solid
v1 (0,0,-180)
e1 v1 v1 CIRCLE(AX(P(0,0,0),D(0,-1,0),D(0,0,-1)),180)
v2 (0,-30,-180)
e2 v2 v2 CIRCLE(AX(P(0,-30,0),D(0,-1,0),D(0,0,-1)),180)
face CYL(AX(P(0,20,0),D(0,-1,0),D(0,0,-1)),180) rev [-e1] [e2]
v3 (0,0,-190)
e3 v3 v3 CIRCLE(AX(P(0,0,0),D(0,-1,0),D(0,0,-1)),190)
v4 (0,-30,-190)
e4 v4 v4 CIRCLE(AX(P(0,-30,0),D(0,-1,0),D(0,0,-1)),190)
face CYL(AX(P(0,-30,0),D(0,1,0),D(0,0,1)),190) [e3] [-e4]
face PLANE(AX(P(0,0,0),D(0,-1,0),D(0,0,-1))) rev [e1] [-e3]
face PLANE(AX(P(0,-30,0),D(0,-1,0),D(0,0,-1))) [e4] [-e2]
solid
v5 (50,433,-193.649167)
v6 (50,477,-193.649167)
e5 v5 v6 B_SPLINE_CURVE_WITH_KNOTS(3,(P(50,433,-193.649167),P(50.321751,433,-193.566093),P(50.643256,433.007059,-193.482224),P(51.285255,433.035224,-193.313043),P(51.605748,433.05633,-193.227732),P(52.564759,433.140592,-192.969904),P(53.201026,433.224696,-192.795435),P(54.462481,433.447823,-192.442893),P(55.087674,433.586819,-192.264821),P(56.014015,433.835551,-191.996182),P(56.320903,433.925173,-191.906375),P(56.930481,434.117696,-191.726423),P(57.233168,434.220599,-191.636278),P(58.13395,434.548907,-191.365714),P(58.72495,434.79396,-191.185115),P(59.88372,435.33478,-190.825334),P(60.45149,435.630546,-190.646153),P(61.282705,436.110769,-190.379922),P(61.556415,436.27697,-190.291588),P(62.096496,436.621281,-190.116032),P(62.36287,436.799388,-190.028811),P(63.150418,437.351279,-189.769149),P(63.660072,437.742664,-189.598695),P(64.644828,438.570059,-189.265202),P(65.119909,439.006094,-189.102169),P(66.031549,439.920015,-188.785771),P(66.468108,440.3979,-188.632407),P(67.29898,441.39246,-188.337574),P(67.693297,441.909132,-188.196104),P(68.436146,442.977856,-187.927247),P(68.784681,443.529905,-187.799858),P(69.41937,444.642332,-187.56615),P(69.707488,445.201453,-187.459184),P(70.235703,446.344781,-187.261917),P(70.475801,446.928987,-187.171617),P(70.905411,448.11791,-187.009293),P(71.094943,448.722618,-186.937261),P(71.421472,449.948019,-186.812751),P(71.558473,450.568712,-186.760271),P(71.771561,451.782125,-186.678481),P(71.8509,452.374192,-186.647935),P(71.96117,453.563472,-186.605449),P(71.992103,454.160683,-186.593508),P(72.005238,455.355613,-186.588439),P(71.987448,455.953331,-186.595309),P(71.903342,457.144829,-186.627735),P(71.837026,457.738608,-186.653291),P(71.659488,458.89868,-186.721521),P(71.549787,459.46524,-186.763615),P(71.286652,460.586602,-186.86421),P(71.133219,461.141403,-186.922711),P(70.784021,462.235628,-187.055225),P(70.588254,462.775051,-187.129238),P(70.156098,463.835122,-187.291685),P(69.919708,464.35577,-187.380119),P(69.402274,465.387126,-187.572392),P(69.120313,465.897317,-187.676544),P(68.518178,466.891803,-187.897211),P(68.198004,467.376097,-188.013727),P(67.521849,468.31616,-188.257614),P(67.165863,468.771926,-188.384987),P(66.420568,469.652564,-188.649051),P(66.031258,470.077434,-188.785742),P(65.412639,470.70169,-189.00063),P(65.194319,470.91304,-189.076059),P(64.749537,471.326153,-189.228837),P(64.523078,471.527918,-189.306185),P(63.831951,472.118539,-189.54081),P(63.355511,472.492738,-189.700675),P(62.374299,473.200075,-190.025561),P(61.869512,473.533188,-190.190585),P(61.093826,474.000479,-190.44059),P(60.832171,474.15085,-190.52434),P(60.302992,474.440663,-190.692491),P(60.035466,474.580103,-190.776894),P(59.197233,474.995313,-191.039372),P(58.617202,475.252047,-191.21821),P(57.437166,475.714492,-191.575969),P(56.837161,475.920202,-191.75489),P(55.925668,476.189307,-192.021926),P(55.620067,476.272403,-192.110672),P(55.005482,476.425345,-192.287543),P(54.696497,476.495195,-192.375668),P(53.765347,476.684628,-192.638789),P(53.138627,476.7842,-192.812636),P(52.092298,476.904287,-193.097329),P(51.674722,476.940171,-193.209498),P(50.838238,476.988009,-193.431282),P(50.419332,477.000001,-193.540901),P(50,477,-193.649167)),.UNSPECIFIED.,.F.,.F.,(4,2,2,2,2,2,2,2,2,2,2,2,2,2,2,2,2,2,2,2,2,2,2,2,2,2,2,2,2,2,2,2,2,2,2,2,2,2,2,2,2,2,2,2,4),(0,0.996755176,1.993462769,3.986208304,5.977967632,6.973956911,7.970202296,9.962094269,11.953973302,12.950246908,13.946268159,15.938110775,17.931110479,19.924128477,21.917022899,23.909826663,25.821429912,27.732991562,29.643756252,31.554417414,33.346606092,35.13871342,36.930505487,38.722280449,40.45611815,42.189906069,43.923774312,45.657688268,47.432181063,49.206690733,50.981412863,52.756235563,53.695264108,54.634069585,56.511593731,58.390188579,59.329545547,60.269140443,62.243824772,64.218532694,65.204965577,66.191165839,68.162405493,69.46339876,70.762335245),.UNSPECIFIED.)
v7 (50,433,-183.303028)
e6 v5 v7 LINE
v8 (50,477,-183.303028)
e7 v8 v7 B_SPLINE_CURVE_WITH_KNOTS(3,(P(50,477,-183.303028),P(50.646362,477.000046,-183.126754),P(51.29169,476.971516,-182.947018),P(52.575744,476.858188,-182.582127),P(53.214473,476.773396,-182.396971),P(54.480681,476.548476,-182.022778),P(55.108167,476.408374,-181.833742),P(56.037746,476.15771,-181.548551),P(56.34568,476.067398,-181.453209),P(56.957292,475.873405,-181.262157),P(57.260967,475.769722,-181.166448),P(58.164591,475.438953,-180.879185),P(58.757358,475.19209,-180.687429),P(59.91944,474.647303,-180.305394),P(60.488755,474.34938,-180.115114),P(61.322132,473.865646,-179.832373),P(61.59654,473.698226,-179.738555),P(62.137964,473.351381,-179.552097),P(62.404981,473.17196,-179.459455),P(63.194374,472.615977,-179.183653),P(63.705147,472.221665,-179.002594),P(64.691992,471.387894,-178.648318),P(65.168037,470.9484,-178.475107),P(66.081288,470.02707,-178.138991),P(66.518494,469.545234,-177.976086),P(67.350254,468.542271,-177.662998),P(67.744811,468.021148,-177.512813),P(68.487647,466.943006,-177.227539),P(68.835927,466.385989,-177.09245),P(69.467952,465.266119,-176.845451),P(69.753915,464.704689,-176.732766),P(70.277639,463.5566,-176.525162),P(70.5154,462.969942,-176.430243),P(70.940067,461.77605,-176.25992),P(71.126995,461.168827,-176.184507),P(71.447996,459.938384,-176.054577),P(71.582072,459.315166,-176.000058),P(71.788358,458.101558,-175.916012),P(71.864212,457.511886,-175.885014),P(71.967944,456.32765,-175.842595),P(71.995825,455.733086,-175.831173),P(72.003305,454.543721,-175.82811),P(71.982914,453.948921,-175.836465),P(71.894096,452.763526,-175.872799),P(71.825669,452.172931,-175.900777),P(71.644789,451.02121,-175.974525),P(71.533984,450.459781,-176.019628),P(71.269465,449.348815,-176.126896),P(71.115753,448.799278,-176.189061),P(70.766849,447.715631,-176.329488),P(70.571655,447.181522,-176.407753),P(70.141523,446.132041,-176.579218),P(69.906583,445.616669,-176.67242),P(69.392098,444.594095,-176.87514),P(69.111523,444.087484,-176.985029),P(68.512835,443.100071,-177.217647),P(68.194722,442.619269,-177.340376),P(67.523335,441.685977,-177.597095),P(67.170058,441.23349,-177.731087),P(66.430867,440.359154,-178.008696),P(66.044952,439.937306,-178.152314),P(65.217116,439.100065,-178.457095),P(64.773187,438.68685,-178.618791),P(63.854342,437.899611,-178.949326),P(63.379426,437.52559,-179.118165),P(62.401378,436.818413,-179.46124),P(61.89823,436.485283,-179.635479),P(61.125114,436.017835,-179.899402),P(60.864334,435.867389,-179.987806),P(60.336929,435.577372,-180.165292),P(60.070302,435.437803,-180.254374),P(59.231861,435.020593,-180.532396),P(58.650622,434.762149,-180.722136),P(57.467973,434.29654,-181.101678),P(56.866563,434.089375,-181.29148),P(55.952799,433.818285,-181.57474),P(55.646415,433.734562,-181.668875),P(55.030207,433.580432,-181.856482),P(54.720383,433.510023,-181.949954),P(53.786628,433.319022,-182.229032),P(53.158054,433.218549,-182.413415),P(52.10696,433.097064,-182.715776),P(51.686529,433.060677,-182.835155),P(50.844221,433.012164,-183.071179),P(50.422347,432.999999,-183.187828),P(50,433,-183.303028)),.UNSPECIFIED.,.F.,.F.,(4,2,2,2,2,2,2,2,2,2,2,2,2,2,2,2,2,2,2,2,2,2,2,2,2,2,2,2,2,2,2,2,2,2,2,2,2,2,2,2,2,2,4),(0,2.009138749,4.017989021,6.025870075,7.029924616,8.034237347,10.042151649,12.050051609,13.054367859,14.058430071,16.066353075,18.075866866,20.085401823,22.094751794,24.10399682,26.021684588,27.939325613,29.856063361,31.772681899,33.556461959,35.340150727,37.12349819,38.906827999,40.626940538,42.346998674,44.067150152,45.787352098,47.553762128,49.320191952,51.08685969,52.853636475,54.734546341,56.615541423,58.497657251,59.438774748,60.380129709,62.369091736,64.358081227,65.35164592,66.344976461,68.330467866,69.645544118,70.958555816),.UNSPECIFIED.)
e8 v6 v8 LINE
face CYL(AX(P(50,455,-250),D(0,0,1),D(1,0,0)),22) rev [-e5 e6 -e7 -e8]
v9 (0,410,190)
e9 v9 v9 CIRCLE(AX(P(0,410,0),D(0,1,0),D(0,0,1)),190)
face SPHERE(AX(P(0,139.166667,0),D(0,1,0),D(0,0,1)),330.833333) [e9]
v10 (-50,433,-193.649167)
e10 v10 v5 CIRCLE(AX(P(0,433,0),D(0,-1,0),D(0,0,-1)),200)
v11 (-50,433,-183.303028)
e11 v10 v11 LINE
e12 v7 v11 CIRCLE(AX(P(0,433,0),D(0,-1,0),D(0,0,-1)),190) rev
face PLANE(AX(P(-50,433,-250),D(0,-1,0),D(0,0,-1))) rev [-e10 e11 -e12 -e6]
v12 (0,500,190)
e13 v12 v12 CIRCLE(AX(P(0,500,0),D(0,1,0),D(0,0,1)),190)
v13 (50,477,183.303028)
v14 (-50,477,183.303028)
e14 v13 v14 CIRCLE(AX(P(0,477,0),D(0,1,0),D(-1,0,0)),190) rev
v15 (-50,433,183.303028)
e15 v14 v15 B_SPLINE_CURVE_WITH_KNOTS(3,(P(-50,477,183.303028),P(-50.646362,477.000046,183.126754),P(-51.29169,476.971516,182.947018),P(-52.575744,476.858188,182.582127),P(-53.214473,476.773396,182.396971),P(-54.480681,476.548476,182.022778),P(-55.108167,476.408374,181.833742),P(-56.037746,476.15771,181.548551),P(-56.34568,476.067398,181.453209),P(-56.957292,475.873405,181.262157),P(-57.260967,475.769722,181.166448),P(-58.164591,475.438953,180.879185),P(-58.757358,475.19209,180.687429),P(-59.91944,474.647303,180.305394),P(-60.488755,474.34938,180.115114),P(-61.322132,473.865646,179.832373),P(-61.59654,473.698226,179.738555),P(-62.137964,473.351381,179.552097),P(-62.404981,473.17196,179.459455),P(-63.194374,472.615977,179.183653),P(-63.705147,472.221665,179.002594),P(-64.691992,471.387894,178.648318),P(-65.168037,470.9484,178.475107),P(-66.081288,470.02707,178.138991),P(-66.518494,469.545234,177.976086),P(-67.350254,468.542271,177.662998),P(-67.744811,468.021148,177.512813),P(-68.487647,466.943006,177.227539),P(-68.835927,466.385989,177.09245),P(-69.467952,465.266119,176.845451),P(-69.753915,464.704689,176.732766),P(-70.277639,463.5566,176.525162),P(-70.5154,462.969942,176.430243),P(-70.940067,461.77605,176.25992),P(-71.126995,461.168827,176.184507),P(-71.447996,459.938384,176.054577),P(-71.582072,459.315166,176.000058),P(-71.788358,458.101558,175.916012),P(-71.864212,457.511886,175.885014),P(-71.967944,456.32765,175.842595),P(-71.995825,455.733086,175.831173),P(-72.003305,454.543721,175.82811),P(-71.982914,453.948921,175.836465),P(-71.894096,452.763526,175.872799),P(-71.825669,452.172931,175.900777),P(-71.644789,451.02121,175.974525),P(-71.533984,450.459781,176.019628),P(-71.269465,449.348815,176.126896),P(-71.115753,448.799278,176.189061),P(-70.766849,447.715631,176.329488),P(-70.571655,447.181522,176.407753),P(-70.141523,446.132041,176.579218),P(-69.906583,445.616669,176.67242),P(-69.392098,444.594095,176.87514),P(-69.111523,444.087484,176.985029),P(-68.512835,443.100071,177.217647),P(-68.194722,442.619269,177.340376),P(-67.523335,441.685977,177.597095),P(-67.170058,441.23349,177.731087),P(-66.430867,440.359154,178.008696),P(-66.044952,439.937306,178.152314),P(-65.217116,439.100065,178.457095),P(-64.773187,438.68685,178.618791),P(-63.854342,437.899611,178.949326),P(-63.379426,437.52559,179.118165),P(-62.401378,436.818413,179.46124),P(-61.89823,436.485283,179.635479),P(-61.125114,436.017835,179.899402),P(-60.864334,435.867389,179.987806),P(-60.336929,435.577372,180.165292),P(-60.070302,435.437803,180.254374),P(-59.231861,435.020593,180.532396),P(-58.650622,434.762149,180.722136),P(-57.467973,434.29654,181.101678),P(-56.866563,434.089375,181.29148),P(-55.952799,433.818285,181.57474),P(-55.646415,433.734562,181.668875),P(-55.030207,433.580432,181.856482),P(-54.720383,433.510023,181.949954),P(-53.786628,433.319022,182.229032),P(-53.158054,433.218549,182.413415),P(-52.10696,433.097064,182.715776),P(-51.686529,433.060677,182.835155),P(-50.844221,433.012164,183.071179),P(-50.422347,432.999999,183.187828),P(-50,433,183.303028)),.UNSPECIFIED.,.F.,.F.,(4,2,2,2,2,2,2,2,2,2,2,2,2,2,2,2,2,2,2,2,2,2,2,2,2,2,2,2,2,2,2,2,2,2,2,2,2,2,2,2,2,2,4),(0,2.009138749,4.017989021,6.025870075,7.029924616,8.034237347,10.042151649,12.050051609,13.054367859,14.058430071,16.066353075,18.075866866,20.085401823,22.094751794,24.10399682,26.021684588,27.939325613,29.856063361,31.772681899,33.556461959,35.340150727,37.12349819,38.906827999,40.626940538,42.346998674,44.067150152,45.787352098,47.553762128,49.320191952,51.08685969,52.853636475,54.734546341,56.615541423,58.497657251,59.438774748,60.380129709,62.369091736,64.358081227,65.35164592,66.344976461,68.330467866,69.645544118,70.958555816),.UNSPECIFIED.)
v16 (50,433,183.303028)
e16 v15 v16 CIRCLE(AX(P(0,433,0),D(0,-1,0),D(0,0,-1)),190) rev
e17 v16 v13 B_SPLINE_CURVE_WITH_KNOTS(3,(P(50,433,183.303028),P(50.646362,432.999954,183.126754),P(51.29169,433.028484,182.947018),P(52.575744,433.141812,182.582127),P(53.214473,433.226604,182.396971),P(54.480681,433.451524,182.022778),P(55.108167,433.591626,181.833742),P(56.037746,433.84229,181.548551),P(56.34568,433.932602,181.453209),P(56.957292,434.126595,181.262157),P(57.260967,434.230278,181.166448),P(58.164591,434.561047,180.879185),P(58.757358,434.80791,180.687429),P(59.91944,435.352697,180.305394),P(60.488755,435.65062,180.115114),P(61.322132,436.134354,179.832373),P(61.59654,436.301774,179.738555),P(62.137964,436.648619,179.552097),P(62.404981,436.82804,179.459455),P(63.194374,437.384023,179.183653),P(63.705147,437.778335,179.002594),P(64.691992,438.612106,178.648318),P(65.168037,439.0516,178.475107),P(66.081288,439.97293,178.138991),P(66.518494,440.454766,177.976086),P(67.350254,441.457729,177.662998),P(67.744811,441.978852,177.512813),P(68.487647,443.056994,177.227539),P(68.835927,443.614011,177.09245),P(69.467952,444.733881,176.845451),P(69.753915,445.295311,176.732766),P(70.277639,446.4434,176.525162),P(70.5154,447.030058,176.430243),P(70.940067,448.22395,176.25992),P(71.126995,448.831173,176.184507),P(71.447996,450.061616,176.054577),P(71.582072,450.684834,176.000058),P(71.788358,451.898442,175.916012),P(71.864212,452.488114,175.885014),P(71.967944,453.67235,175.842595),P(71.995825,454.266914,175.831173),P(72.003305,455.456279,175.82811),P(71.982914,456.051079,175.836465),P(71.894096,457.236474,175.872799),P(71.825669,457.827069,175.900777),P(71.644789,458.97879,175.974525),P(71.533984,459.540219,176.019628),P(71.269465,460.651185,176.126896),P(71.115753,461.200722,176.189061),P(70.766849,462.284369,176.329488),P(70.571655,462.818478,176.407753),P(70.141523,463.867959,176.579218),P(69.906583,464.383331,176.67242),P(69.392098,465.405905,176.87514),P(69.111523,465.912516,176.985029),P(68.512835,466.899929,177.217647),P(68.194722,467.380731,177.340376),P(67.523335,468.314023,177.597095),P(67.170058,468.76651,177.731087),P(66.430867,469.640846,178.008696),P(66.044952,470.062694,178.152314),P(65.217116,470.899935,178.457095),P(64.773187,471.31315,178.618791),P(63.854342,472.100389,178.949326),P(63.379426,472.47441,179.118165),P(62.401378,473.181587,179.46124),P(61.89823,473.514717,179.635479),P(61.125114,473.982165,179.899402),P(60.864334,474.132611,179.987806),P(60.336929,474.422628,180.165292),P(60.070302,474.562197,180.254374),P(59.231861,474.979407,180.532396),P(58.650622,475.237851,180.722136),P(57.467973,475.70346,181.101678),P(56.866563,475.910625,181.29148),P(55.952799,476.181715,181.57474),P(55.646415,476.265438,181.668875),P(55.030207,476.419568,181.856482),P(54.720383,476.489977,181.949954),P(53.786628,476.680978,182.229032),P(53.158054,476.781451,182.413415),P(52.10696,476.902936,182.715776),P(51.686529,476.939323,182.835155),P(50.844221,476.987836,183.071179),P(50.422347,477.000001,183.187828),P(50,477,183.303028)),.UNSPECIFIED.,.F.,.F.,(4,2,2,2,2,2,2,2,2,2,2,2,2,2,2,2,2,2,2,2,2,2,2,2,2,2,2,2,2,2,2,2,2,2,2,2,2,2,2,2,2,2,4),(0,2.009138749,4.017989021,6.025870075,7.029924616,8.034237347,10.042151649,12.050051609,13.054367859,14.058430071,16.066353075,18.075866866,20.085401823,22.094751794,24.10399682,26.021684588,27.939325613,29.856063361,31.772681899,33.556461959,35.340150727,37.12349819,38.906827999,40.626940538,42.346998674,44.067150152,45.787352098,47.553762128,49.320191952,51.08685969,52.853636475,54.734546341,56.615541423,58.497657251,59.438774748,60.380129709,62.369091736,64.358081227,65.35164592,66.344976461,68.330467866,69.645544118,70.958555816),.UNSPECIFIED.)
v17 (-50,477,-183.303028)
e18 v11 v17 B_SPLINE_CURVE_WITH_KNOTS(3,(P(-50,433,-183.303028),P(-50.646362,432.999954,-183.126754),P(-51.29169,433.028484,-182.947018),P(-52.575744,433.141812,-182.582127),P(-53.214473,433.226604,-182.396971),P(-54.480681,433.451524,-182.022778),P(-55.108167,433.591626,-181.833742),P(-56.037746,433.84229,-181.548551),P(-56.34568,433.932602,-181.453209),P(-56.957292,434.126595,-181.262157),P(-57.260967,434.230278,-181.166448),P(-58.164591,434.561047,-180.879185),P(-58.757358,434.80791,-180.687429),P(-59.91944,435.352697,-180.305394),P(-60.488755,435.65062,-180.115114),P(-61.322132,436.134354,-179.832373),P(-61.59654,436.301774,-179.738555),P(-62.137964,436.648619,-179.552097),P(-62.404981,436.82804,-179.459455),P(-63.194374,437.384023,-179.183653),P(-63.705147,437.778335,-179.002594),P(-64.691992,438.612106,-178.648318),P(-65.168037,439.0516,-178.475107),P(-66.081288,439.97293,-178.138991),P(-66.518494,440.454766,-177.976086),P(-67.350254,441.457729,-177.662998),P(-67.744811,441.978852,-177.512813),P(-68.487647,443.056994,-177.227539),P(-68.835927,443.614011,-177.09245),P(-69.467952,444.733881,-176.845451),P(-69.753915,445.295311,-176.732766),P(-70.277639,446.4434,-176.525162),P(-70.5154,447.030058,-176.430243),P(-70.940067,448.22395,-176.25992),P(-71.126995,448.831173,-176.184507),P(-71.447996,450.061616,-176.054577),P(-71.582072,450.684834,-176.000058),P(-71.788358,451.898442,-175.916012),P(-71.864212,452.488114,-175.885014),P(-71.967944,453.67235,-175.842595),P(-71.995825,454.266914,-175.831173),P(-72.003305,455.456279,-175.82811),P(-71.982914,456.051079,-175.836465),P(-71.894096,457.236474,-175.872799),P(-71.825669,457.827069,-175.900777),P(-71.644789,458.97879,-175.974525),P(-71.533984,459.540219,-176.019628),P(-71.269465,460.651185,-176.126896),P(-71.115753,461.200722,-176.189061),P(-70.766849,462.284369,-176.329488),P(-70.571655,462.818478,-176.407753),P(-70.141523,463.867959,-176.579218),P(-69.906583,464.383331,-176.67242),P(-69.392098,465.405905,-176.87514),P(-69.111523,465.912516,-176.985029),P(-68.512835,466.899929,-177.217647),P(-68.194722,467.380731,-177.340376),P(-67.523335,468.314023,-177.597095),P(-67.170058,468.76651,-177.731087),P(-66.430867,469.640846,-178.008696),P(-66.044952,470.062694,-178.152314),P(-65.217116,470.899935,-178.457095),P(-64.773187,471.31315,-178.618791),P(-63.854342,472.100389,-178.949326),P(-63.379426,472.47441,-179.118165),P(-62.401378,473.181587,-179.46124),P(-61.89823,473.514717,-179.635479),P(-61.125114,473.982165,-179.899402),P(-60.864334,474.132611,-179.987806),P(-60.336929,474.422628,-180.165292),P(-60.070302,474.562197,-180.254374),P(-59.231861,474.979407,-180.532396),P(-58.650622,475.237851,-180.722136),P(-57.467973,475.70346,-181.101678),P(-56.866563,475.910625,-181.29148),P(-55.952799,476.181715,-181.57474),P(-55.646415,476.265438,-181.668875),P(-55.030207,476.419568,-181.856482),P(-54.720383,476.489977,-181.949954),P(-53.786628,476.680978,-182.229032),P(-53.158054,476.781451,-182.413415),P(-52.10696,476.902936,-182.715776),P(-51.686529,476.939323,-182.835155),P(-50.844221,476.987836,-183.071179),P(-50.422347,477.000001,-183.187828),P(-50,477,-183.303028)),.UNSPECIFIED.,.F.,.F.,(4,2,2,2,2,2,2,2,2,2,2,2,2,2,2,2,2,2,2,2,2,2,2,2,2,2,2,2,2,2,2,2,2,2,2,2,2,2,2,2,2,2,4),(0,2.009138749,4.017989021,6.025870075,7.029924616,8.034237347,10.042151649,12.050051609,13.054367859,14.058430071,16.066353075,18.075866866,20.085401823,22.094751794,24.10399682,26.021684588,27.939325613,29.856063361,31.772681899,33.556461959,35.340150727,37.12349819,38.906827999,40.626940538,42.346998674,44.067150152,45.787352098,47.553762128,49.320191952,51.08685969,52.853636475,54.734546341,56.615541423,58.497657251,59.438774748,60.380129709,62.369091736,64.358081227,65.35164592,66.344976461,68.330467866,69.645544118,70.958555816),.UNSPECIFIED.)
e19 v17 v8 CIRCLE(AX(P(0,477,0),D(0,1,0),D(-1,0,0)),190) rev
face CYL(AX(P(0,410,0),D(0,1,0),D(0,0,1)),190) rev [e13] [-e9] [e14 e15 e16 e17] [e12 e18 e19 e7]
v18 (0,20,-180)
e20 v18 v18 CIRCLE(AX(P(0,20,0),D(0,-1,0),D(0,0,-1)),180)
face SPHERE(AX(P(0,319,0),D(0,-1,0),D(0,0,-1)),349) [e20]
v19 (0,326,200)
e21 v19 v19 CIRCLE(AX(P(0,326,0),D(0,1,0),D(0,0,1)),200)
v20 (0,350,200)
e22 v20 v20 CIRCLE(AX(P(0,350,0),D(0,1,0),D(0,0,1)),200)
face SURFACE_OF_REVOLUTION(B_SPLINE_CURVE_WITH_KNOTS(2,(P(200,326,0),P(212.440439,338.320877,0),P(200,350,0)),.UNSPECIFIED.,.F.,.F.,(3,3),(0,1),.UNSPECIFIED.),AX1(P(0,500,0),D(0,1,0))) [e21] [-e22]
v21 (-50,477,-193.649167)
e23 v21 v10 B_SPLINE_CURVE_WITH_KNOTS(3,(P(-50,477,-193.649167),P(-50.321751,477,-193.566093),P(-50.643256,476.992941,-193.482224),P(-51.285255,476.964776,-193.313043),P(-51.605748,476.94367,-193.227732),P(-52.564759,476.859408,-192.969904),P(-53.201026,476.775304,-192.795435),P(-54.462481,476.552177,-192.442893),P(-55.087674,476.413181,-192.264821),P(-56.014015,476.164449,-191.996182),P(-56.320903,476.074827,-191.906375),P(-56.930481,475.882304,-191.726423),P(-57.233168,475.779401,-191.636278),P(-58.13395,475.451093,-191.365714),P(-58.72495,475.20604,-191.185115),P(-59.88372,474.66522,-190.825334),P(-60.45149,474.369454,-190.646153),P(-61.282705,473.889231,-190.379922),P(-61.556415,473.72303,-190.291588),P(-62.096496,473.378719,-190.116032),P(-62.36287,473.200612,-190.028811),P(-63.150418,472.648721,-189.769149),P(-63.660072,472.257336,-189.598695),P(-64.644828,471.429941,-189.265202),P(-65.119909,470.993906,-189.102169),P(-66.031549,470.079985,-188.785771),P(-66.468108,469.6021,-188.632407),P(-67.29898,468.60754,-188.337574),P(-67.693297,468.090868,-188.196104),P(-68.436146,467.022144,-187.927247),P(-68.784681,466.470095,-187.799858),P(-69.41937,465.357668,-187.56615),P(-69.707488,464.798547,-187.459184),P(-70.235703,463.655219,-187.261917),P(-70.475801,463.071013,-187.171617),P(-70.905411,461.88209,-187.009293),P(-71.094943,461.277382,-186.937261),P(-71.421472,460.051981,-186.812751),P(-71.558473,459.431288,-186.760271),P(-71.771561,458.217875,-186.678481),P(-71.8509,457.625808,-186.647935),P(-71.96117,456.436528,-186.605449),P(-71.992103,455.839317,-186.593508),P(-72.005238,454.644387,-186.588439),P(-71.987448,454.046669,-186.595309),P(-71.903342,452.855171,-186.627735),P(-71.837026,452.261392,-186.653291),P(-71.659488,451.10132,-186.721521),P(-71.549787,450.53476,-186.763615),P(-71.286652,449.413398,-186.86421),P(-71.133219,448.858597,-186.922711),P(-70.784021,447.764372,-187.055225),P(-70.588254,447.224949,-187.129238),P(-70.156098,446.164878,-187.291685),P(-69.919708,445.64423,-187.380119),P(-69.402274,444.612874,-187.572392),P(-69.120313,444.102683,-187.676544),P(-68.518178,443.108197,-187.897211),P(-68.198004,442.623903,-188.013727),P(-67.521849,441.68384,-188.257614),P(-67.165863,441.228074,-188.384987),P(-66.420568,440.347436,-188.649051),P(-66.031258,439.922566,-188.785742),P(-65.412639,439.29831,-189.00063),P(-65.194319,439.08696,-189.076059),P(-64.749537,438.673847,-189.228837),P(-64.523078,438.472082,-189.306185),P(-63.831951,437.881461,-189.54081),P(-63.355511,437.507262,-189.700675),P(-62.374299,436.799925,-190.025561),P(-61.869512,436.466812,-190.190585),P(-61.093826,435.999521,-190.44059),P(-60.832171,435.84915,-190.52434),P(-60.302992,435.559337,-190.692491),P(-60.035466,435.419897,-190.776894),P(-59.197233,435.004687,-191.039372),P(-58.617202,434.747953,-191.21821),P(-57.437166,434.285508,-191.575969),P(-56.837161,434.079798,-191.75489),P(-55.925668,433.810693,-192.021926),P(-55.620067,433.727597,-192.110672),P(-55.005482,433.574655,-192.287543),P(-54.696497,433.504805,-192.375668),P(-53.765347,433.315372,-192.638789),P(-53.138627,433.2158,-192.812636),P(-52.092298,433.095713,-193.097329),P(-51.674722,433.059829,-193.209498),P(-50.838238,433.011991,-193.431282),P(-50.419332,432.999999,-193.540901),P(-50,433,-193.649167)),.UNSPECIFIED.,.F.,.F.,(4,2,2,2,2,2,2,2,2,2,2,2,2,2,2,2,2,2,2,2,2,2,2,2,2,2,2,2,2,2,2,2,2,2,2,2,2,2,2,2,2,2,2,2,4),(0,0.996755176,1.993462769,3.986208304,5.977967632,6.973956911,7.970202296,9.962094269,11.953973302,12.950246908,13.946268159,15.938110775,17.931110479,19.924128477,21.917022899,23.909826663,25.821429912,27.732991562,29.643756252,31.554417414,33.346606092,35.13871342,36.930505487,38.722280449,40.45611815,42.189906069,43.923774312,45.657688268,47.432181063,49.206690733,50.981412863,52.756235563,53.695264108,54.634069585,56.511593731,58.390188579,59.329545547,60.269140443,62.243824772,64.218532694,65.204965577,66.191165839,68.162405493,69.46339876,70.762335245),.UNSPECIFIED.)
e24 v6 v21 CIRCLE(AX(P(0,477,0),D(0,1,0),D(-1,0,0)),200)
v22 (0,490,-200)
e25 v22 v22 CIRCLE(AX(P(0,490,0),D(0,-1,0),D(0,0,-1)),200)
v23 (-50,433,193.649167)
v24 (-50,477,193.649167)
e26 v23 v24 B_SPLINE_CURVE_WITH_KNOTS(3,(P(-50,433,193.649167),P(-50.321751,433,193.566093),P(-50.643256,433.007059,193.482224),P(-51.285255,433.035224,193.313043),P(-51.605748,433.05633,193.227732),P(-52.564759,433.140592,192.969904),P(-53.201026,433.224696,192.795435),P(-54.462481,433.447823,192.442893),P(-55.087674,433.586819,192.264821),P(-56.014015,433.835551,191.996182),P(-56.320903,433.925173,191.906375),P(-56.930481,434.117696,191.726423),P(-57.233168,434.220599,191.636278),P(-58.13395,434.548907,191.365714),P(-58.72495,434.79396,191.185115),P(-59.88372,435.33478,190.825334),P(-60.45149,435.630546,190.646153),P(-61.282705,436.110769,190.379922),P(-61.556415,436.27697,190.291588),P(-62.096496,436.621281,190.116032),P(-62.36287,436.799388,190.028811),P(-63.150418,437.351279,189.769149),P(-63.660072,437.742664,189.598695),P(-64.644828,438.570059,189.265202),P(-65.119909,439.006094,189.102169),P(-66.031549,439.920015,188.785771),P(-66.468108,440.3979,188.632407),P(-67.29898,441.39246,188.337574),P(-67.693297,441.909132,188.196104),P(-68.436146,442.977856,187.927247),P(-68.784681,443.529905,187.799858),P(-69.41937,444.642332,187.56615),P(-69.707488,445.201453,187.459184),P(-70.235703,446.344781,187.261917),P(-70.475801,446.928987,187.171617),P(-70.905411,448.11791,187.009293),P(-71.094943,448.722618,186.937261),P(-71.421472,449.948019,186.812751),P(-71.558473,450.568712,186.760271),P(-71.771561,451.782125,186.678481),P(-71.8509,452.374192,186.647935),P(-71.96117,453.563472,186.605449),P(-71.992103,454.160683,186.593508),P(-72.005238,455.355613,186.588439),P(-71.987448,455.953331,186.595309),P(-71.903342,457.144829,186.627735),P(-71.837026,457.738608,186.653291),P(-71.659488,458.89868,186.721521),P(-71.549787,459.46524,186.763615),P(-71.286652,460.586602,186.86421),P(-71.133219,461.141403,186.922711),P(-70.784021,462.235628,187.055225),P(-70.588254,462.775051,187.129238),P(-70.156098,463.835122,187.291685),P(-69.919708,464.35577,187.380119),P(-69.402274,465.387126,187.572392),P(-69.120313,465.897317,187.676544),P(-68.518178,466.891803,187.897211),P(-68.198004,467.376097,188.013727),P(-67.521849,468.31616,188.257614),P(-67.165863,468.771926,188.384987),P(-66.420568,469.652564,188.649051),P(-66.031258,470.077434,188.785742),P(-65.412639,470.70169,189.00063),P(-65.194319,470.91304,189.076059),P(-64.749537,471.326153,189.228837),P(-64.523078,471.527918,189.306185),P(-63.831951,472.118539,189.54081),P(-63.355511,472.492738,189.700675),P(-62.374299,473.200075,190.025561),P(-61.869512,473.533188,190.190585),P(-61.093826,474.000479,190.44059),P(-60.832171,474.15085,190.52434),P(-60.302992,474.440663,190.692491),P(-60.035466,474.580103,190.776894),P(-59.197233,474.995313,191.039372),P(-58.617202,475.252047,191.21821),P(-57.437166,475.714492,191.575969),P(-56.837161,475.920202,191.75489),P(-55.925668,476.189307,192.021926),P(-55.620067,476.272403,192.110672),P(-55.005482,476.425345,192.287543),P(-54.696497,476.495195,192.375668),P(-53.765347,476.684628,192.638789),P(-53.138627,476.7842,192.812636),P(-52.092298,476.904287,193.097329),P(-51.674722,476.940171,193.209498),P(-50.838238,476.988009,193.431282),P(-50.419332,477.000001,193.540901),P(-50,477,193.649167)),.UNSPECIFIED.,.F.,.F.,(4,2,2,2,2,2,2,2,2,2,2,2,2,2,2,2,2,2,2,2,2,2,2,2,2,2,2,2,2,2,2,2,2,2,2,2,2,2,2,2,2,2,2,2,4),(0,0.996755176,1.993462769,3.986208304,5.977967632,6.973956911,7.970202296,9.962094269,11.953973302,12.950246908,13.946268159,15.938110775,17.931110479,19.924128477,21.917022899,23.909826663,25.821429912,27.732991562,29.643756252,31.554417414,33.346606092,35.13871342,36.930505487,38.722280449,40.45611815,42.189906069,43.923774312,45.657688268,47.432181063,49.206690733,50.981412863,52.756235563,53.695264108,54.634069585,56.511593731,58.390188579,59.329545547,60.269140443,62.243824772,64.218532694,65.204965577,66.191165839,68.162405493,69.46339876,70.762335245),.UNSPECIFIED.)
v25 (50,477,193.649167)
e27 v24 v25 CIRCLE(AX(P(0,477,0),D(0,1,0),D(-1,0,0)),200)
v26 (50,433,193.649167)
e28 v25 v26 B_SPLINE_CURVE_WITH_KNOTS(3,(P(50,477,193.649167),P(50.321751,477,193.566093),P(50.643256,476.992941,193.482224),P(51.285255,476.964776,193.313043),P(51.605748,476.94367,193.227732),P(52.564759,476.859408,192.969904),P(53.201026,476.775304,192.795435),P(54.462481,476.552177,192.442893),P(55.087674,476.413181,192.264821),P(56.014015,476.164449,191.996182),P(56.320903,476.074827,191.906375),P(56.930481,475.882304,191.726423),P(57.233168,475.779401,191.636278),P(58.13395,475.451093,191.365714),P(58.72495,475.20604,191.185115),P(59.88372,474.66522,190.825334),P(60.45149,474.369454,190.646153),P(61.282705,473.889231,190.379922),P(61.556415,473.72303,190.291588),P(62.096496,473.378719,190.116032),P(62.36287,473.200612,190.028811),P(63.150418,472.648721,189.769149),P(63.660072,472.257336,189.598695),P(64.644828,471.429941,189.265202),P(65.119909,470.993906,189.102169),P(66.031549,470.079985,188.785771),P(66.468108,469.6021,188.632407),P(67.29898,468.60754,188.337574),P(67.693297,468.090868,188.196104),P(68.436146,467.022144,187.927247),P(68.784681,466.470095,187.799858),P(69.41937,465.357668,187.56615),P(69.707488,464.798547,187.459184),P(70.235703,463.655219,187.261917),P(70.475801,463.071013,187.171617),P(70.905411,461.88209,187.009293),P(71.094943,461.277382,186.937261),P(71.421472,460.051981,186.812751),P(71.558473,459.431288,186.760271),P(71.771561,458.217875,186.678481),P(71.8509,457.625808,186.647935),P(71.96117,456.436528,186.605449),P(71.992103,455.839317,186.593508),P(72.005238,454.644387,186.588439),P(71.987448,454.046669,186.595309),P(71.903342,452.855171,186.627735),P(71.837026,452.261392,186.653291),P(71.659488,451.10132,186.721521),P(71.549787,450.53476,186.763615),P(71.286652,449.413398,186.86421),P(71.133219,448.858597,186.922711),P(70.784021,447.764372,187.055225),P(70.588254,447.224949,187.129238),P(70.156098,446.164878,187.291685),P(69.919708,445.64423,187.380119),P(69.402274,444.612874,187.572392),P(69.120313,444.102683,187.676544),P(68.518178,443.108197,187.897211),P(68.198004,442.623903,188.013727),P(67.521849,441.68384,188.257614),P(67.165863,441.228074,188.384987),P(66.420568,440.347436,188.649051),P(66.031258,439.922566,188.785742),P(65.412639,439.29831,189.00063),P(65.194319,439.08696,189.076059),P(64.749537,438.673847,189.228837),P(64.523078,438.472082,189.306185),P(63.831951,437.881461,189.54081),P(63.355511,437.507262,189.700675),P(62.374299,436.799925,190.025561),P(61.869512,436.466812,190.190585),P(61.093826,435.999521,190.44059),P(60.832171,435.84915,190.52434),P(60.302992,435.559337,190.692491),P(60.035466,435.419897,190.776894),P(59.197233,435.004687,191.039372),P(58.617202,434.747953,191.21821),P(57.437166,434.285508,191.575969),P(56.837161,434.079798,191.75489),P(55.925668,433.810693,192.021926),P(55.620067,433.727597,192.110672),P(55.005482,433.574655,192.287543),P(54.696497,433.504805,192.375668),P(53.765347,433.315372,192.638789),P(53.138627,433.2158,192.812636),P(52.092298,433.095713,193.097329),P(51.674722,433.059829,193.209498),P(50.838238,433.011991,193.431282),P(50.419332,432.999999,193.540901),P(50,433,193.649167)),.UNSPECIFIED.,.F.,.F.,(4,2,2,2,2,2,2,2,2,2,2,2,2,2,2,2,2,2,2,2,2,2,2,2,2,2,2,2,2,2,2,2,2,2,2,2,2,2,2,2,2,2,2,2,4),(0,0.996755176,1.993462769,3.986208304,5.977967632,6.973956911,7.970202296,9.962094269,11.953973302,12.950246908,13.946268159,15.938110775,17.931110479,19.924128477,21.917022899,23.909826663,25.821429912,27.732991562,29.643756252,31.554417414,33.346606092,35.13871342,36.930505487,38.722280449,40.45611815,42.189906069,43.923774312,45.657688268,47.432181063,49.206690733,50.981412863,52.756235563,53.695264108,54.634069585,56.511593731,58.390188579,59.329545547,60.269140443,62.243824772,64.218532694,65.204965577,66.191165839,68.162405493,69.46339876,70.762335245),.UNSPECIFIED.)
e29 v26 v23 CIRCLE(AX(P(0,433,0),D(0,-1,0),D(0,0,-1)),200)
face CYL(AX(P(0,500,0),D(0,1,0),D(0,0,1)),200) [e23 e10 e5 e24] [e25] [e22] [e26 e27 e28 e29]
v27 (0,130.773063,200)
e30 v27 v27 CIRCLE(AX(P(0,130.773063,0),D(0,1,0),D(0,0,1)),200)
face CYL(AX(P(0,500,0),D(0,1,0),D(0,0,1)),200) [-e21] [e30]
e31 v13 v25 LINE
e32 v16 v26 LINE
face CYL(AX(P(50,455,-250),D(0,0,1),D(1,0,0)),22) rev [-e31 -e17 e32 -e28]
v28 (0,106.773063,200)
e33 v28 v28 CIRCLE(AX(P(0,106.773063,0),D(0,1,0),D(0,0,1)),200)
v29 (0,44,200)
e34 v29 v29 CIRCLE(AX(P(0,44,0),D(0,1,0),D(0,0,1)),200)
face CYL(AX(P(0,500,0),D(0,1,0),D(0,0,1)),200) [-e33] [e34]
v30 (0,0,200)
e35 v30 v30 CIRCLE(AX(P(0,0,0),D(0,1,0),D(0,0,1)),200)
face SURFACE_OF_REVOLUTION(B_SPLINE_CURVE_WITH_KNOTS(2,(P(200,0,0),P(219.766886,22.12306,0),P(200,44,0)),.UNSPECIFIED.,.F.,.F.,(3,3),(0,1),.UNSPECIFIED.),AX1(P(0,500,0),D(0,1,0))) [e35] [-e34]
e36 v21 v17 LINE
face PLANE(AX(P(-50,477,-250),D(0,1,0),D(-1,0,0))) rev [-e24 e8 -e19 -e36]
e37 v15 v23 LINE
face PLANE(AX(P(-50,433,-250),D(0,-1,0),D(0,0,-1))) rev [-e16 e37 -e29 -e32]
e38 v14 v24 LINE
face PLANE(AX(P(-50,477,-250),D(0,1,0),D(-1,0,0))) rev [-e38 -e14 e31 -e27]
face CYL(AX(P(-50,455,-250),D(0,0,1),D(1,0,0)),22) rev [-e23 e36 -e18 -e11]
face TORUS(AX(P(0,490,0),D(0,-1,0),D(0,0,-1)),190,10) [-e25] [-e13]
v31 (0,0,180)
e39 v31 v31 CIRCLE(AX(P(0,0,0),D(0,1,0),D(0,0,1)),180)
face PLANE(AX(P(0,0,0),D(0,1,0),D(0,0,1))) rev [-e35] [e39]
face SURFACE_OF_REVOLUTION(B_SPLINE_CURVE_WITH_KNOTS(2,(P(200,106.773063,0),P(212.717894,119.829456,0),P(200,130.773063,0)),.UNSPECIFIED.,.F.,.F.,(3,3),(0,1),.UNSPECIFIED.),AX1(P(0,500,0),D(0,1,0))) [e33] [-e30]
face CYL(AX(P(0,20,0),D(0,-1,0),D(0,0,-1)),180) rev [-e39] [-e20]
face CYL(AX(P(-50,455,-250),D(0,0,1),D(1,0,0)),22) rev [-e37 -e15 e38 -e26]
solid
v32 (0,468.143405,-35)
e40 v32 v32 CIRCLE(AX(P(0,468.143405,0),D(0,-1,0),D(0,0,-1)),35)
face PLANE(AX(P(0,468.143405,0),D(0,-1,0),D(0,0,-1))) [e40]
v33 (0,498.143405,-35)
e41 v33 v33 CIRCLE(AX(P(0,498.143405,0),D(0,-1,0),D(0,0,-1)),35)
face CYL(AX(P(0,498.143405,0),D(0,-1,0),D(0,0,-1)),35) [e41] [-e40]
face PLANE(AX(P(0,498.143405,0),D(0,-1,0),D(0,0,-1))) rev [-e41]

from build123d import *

# Parameters (mm, degrees)
SKETCH2_R           = 190
CUT_EXTRUDE1_DEPTH  = 90
FILLET1_R           = 10
CUT_EXTRUDE2_DEPTH  = 250
DOME1_FACE_RADIUS   = 190
DOME1_HEIGHT        = 60
SKETCH5_R           = 190
BOSS_EXTRUDE1_DEPTH = 30
BOSS_EXTRUDE2_START = 468.143405
SKETCH6_R           = 35
BOSS_EXTRUDE2_DEPTH = 30
SKETCH7_R           = 180
CUT_EXTRUDE3_DEPTH  = 50
DOME2_FACE_RADIUS   = 180
DOME2_HEIGHT        = 50


with BuildPart() as part:
    # Sketch1 → Revolve1 (revolve)
    with BuildSketch(Plane.XY, mode=Mode.PRIVATE) as revolve1_sk:
        with BuildLine():
            Line((0, 500), (0, 0))
            Line((0, 0), (200, 0))
            add(Edge.make_bspline(
                [(200, 44), (219.766886066, 22.123059656), (200, 0)],
                knots=[0, 0, 0, 1, 1, 1], degree=2))
            Line((200, 44), (200, 106.773063114))
            add(Edge.make_bspline(
                [(200, 130.773063114), (212.717893657, 119.829456351), (200, 106.773063114)],
                knots=[0, 0, 0, 1, 1, 1], degree=2))
            Line((200, 130.773063114), (200, 326))
            add(Edge.make_bspline(
                [(200, 350), (212.44043914, 338.320876657), (200, 326)],
                knots=[0, 0, 0, 1, 1, 1], degree=2))
            Line((200, 350), (200, 500))
            Line((200, 500), (0, 500))
        make_face()
    revolve(revolve1_sk.sketch.rotate(Axis((0, 500, 0), (0, -1, 0)), 90), axis=Axis((0, 500, 0), (0, -1, 0)))

    # Sketch2 → Cut-Extrude1 (cut)
    with BuildSketch(Plane(origin=(0, 500, 0), x_dir=(1, 0, 0), z_dir=(0, 1, 0))):
        with Locations(Location((0, 0, 0), (0, 0, 270))):
            Circle(SKETCH2_R)
    extrude(amount=-CUT_EXTRUDE1_DEPTH, mode=Mode.SUBTRACT)

    # Fillet1
    fillet1_edges = [part.edges().sort_by_distance(p)[0] for p in [
        (0, 500, -200),
    ]]
    fillet(fillet1_edges, radius=FILLET1_R - 0.0001)  # a hair under: the kernel refuses the full size

    # Sketch3 → Cut-Extrude2 (cut, symmetric)
    with BuildSketch(Plane.XY):
        with BuildLine():
            Line((-50, 477), (50, 477))
            ThreePointArc((50, 477), (72, 455), (50, 433))
            Line((50, 433), (-50, 433))
            ThreePointArc((-50, 433), (-72, 455), (-50, 477))
        make_face()
    extrude(amount=CUT_EXTRUDE2_DEPTH, both=True, mode=Mode.SUBTRACT)

    # Dome1: a dome of height H over a round flat face of radius A is a cap of a sphere of radius (A * A + H * H) / (2 * H)
    dome1_r = (DOME1_FACE_RADIUS * DOME1_FACE_RADIUS + DOME1_HEIGHT * DOME1_HEIGHT) / (2 * DOME1_HEIGHT)
    dome1_base = Plane((0, 410, 0), z_dir=(0, 1, 0))
    with Locations(dome1_base.offset(DOME1_HEIGHT - dome1_r)):
        dome1_ball = Sphere(dome1_r, mode=Mode.PRIVATE)
    add(split(dome1_ball, bisect_by=dome1_base, keep=Keep.TOP, mode=Mode.PRIVATE))


with BuildPart() as body_2:
    # Sketch5 → Boss-Extrude1 (new body)
    with BuildSketch(Plane.XZ):
        with Locations(Location((0, 0, 0), (0, 0, 270))):
            Circle(SKETCH5_R)
    extrude(amount=BOSS_EXTRUDE1_DEPTH)


with BuildPart() as body_3:
    # Sketch6 → Boss-Extrude2 (new body)
    with BuildSketch(Plane(origin=(0, 0, 0), x_dir=(1, 0, 0), z_dir=(0, 1, 0)).offset(BOSS_EXTRUDE2_START)):
        with Locations(Location((0, 0, 0), (0, 0, 90))):
            Circle(SKETCH6_R)
    extrude(amount=BOSS_EXTRUDE2_DEPTH)


with BuildPart() as cut_extrude3_tool:
    # Sketch7 → Cut-Extrude3 (new body)
    with BuildSketch(Plane.XZ.offset(30)):
        with Locations(Location((0, 0, 0), (0, 0, 270))):
            Circle(SKETCH7_R)
    extrude(amount=-CUT_EXTRUDE3_DEPTH)


with BuildPart() as part_1:
    add(part.part)

    # Cut-Extrude3: cut by cut_extrude3_tool
    add(cut_extrude3_tool.part, mode=Mode.SUBTRACT)

    # Dome2: a dome of height H over a round flat face of radius A is a cap of a sphere of radius (A * A + H * H) / (2 * H)
    dome2_r = (DOME2_FACE_RADIUS * DOME2_FACE_RADIUS + DOME2_HEIGHT * DOME2_HEIGHT) / (2 * DOME2_HEIGHT)
    dome2_base = Plane((0, 20, 0), z_dir=(0, -1, 0))
    with Locations(dome2_base.offset(DOME2_HEIGHT - dome2_r)):
        dome2_ball = Sphere(dome2_r, mode=Mode.PRIVATE)
    add(split(dome2_ball, bisect_by=dome2_base, keep=Keep.TOP, mode=Mode.PRIVATE))


with BuildPart() as body_2_1:
    add(body_2.part)

    # Cut-Extrude3: cut by cut_extrude3_tool
    add(cut_extrude3_tool.part, mode=Mode.SUBTRACT)


solid = Compound([body_3.part, part_1.part, body_2_1.part])
